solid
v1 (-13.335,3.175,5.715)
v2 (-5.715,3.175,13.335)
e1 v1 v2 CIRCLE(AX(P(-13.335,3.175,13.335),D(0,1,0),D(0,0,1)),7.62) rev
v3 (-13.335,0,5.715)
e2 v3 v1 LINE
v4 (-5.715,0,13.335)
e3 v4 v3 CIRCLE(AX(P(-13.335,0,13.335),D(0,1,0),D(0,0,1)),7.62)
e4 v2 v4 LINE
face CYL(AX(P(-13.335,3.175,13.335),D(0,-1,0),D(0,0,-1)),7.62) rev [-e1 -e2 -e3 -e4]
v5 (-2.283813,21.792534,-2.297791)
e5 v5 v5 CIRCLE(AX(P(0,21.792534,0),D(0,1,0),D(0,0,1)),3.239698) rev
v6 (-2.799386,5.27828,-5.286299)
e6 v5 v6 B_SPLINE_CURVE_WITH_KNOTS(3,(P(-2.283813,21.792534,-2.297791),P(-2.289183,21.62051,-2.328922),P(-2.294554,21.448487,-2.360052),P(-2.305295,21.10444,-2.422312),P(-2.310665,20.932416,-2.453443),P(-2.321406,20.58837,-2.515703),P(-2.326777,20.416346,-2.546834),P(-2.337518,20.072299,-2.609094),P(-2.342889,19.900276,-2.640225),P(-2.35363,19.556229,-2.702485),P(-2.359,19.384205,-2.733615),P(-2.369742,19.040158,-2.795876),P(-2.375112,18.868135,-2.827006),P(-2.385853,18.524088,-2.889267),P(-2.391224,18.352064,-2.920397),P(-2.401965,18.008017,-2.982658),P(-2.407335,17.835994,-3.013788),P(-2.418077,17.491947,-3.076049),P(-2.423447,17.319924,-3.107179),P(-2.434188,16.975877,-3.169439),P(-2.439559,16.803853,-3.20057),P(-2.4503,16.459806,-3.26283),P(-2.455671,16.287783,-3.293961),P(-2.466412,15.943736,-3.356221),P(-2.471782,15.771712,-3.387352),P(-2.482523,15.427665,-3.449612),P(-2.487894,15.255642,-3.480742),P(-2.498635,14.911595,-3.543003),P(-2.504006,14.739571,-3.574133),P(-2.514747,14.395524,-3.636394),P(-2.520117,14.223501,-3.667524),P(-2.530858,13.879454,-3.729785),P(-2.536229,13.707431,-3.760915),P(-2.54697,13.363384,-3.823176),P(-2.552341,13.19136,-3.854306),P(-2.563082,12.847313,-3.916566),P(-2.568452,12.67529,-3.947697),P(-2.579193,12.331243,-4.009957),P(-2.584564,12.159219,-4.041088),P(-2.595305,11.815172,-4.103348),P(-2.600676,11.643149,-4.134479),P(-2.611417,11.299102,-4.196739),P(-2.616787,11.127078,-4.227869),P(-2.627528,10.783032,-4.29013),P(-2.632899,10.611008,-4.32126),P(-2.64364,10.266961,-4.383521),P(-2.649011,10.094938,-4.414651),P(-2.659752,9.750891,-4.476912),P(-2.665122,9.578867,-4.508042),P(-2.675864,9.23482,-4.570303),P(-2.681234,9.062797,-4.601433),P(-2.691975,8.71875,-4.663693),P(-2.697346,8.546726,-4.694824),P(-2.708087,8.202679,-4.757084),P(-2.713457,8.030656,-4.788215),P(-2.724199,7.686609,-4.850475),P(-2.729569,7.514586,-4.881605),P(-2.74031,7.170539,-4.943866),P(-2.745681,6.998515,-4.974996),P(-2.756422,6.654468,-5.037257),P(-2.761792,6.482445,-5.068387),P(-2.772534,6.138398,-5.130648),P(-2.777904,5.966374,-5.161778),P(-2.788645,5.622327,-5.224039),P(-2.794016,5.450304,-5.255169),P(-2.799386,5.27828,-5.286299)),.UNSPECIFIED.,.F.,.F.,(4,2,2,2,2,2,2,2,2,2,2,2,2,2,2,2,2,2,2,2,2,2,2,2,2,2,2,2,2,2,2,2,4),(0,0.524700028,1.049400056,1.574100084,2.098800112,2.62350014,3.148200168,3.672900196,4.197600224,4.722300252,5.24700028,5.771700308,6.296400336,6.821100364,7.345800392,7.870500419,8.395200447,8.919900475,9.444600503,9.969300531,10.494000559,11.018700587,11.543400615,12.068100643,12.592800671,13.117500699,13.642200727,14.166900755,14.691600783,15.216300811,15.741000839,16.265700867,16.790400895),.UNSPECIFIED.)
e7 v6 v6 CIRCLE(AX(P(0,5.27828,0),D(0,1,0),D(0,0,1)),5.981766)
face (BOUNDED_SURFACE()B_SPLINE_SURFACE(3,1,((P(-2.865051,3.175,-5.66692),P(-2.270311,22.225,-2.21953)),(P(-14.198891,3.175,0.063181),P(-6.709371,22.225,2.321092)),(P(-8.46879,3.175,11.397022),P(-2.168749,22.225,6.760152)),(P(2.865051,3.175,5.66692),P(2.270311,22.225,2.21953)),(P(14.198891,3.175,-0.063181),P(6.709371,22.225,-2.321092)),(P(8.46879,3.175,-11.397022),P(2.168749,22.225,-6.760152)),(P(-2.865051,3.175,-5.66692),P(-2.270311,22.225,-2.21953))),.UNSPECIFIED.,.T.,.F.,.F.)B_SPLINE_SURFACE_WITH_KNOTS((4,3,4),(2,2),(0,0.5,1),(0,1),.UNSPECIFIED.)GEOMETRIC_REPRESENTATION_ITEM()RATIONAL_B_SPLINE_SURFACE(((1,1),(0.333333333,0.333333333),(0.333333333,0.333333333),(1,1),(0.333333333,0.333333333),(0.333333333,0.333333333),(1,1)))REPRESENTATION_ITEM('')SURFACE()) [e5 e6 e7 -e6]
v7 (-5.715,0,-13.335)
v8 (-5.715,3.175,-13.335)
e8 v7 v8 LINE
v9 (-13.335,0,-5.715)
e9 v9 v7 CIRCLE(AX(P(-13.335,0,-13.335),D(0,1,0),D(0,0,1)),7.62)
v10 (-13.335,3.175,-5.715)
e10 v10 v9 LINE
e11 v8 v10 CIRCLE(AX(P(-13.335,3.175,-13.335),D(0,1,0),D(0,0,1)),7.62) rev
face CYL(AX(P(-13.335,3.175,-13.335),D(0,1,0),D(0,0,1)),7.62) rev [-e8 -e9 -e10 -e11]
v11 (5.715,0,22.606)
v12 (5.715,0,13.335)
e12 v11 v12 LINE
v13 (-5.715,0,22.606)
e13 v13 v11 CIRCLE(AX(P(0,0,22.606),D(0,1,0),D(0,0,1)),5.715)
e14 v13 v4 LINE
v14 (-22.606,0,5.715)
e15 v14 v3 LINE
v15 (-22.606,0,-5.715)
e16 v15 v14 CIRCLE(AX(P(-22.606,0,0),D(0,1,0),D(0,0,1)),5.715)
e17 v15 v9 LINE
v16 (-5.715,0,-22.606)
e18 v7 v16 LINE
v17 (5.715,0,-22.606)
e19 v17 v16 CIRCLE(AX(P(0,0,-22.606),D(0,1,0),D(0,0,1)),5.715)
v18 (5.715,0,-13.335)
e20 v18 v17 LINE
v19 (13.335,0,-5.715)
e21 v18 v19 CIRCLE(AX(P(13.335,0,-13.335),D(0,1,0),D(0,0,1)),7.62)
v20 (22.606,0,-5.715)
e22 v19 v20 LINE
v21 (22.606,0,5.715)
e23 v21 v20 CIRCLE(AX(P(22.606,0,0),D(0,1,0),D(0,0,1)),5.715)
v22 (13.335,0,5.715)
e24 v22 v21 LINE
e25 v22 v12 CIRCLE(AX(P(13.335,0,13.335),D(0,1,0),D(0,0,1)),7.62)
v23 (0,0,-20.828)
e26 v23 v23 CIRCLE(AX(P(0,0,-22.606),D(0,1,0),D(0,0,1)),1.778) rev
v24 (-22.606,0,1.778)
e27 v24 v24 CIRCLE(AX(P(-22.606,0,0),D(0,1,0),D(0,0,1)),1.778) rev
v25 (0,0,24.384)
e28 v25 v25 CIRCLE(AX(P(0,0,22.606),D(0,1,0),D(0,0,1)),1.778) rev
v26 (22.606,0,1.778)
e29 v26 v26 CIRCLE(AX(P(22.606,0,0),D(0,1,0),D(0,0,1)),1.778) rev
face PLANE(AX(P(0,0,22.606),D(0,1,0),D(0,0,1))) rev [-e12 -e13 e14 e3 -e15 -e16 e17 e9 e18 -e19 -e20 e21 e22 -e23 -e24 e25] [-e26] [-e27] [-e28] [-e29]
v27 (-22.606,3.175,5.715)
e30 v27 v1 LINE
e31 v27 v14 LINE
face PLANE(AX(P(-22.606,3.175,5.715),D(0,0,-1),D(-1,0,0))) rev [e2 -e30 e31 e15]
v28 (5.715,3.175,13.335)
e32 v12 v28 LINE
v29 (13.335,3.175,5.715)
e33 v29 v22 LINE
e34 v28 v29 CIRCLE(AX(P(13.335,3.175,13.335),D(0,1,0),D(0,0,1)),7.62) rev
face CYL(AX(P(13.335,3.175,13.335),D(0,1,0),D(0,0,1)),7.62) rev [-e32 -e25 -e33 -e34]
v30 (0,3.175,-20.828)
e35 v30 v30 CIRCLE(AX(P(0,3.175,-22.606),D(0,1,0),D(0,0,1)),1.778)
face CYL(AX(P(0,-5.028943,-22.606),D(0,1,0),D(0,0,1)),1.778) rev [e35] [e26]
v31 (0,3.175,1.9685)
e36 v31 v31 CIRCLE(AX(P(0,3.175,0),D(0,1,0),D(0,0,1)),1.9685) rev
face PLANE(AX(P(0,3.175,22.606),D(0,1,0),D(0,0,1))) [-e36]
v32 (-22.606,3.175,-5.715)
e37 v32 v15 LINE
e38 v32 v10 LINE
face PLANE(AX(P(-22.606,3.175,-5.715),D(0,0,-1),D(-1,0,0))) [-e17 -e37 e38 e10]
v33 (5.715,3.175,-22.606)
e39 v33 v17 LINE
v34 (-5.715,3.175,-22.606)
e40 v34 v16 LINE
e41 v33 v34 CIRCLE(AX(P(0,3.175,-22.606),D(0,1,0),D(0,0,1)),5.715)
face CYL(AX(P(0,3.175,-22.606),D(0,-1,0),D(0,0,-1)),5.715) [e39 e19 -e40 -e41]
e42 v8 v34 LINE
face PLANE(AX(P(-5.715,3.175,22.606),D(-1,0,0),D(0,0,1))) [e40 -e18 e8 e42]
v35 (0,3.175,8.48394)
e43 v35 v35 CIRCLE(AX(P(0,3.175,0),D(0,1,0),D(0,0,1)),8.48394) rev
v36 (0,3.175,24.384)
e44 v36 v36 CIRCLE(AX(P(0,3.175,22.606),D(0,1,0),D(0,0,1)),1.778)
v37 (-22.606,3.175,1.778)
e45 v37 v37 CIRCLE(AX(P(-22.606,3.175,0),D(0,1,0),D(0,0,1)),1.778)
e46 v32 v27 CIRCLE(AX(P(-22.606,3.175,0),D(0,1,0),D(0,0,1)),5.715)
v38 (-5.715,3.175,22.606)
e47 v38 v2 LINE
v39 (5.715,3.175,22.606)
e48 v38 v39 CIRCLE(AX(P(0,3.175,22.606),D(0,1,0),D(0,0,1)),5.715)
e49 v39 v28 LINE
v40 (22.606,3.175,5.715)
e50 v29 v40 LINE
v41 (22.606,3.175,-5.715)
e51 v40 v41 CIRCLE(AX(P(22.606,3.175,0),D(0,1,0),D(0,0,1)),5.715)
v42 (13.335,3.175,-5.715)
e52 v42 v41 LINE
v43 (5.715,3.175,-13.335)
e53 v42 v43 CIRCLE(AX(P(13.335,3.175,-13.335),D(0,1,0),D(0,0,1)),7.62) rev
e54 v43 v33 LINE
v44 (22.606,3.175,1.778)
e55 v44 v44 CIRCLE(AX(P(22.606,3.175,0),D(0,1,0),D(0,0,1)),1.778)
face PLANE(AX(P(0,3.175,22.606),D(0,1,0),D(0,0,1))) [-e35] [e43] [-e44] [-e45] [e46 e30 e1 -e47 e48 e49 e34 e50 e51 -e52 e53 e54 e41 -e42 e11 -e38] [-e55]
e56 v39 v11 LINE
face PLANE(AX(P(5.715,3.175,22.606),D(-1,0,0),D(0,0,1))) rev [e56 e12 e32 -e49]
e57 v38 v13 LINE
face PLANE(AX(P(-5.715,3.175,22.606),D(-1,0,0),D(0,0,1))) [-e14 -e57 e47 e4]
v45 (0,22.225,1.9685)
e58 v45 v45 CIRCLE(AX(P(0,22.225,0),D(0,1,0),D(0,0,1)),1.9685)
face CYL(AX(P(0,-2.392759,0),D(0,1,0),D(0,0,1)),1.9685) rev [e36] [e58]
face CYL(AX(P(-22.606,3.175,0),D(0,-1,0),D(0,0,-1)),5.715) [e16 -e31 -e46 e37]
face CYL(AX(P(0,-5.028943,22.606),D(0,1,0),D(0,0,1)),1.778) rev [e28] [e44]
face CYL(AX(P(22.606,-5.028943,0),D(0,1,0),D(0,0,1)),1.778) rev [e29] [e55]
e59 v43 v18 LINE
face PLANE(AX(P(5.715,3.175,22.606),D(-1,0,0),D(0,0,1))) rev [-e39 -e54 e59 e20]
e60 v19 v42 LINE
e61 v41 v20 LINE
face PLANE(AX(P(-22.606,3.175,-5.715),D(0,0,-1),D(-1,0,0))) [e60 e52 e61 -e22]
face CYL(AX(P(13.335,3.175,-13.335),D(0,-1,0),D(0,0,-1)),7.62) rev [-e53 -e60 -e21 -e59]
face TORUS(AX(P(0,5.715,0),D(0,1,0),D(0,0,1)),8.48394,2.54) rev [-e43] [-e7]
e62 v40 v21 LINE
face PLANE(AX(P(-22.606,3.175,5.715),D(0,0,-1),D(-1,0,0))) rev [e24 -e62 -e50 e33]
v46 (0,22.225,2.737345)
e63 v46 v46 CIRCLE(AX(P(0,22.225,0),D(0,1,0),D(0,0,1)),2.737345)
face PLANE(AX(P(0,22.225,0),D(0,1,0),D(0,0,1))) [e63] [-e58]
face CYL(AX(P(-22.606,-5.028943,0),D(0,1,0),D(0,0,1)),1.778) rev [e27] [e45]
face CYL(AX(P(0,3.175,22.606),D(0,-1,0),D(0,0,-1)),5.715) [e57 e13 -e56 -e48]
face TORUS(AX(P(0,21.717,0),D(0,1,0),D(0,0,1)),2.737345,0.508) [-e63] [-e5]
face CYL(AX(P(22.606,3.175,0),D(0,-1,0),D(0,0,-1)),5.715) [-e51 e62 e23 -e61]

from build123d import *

# Parameters (mm, degrees)
BOSS_EXTRUDE1_DEPTH = 3.175
FILLET1_R           = 7.62
FILLET2_R           = 2.54
SKETCH4_R           = 1.9685
CUT_EXTRUDE1_DEPTH  = 19.05
FILLET3_R           = 0.508
SKETCH6_R           = 1.778
CUT_EXTRUDE2_DEPTH  = 3.175


with BuildPart() as part:
    # Sketch1 → Boss-Extrude1 (new body)
    with BuildSketch(Plane(origin=(0, 0, 0), x_dir=(1, 0, 0), z_dir=(0, 1, 0))):
        with BuildLine():
            Line((-22.606, 5.715), (22.606, 5.715))
            ThreePointArc((22.606, 5.715), (28.321, 0), (22.606, -5.715))
            Line((22.606, -5.715), (-22.606, -5.715))
            ThreePointArc((-22.606, -5.715), (-28.321, 0), (-22.606, 5.715))
        make_face()
        with BuildLine():
            Line((-5.715, -22.606), (-5.715, 22.606))
            ThreePointArc((-5.715, 22.606), (0, 28.321), (5.715, 22.606))
            Line((5.715, 22.606), (5.715, -22.606))
            ThreePointArc((5.715, -22.606), (0, -28.321), (-5.715, -22.606))
        make_face()
    extrude(amount=BOSS_EXTRUDE1_DEPTH)

    # Fillet1
    fillet1_edges = [part.edges().sort_by_distance(p)[0] for p in [
        (-5.715, 1.5875, -5.715),
        (-5.715, 1.5875, 5.715),
        (5.715, 1.5875, -5.715),
        (5.715, 1.5875, 5.715),
    ]]
    fillet(fillet1_edges, radius=FILLET1_R)

    # Loft1: read off the stored shape, not the designer's step
    # Loft1: loft between two sections, ruled curve by curve
    loft1_from = [
        Edge.make_bspline([(-2.865050686, 3.175, -5.666920201), (-14.198891088, 3.175, 0.063181171), (-8.468789716, 3.175, 11.397021573), (2.865050686, 3.175, 5.666920201), (14.198891088, 3.175, -0.063181171), (8.468789716, 3.175, -11.397021573), (-2.865050686, 3.175, -5.666920201)], [0, 0, 0, 0, 0.5, 0.5, 0.5, 1, 1, 1, 1], 3, [1, 0.333333333, 0.333333333, 1, 0.333333333, 0.333333333, 1]),
    ]
    loft1_to = [
        Edge.make_bspline([(-2.270310983, 22.225, -2.219529914), (-6.709370811, 22.225, 2.321092053), (-2.168748845, 22.225, 6.760151881), (2.270310983, 22.225, 2.219529914), (6.709370811, 22.225, -2.321092053), (2.168748845, 22.225, -6.760151881), (-2.270310983, 22.225, -2.219529914)], [0, 0, 0, 0, 0.5, 0.5, 0.5, 1, 1, 1, 1], 3, [1, 0.333333333, 0.333333333, 1, 0.333333333, 0.333333333, 1]),
    ]
    loft1 = Solid(Shell([*[Face.make_surface_from_curves(loft1_from[k], loft1_to[k]) for k in range(1)], Face(Wire(loft1_from)), Face(Wire(loft1_to))]))
    add(loft1)

    # Fillet2
    fillet2_edges = [part.edges().sort_by_distance(p)[0] for p in [
        (2.865050686, 3.175, 5.666920201),
    ]]
    fillet(fillet2_edges, radius=FILLET2_R)

    # Sketch4 → Cut-Extrude1 (cut)
    with BuildSketch(Plane(origin=(0, 22.225, 0), x_dir=(1, 0, 0), z_dir=(0, 1, 0))):
        with Locations(Location((0, 0, 0), (0, 0, 270))):
            Circle(SKETCH4_R)
    extrude(amount=-CUT_EXTRUDE1_DEPTH, mode=Mode.SUBTRACT)

    # Fillet3
    fillet3_edges = [part.edges().sort_by_distance(p)[0] for p in [
        (2.270310983, 22.225, 2.219529914),
    ]]
    fillet(fillet3_edges, radius=FILLET3_R)

    # Sketch6 → Cut-Extrude2 (cut)
    with BuildSketch(Plane(origin=(0, 3.175, 0), x_dir=(1, 0, 0), z_dir=(0, 1, 0))):
        with Locations(Location((-22.606, 0, 0), (0, 0, 270))):
            Circle(SKETCH6_R)
        with Locations(Location((22.606, 0, 0), (0, 0, 270))):
            Circle(SKETCH6_R)
        with Locations(Location((0, 22.606, 0), (0, 0, 270))):
            Circle(SKETCH6_R)
        with Locations(Location((0, -22.606, 0), (0, 0, 270))):
            Circle(SKETCH6_R)
    extrude(amount=-CUT_EXTRUDE2_DEPTH, mode=Mode.SUBTRACT)


solid = part.part
